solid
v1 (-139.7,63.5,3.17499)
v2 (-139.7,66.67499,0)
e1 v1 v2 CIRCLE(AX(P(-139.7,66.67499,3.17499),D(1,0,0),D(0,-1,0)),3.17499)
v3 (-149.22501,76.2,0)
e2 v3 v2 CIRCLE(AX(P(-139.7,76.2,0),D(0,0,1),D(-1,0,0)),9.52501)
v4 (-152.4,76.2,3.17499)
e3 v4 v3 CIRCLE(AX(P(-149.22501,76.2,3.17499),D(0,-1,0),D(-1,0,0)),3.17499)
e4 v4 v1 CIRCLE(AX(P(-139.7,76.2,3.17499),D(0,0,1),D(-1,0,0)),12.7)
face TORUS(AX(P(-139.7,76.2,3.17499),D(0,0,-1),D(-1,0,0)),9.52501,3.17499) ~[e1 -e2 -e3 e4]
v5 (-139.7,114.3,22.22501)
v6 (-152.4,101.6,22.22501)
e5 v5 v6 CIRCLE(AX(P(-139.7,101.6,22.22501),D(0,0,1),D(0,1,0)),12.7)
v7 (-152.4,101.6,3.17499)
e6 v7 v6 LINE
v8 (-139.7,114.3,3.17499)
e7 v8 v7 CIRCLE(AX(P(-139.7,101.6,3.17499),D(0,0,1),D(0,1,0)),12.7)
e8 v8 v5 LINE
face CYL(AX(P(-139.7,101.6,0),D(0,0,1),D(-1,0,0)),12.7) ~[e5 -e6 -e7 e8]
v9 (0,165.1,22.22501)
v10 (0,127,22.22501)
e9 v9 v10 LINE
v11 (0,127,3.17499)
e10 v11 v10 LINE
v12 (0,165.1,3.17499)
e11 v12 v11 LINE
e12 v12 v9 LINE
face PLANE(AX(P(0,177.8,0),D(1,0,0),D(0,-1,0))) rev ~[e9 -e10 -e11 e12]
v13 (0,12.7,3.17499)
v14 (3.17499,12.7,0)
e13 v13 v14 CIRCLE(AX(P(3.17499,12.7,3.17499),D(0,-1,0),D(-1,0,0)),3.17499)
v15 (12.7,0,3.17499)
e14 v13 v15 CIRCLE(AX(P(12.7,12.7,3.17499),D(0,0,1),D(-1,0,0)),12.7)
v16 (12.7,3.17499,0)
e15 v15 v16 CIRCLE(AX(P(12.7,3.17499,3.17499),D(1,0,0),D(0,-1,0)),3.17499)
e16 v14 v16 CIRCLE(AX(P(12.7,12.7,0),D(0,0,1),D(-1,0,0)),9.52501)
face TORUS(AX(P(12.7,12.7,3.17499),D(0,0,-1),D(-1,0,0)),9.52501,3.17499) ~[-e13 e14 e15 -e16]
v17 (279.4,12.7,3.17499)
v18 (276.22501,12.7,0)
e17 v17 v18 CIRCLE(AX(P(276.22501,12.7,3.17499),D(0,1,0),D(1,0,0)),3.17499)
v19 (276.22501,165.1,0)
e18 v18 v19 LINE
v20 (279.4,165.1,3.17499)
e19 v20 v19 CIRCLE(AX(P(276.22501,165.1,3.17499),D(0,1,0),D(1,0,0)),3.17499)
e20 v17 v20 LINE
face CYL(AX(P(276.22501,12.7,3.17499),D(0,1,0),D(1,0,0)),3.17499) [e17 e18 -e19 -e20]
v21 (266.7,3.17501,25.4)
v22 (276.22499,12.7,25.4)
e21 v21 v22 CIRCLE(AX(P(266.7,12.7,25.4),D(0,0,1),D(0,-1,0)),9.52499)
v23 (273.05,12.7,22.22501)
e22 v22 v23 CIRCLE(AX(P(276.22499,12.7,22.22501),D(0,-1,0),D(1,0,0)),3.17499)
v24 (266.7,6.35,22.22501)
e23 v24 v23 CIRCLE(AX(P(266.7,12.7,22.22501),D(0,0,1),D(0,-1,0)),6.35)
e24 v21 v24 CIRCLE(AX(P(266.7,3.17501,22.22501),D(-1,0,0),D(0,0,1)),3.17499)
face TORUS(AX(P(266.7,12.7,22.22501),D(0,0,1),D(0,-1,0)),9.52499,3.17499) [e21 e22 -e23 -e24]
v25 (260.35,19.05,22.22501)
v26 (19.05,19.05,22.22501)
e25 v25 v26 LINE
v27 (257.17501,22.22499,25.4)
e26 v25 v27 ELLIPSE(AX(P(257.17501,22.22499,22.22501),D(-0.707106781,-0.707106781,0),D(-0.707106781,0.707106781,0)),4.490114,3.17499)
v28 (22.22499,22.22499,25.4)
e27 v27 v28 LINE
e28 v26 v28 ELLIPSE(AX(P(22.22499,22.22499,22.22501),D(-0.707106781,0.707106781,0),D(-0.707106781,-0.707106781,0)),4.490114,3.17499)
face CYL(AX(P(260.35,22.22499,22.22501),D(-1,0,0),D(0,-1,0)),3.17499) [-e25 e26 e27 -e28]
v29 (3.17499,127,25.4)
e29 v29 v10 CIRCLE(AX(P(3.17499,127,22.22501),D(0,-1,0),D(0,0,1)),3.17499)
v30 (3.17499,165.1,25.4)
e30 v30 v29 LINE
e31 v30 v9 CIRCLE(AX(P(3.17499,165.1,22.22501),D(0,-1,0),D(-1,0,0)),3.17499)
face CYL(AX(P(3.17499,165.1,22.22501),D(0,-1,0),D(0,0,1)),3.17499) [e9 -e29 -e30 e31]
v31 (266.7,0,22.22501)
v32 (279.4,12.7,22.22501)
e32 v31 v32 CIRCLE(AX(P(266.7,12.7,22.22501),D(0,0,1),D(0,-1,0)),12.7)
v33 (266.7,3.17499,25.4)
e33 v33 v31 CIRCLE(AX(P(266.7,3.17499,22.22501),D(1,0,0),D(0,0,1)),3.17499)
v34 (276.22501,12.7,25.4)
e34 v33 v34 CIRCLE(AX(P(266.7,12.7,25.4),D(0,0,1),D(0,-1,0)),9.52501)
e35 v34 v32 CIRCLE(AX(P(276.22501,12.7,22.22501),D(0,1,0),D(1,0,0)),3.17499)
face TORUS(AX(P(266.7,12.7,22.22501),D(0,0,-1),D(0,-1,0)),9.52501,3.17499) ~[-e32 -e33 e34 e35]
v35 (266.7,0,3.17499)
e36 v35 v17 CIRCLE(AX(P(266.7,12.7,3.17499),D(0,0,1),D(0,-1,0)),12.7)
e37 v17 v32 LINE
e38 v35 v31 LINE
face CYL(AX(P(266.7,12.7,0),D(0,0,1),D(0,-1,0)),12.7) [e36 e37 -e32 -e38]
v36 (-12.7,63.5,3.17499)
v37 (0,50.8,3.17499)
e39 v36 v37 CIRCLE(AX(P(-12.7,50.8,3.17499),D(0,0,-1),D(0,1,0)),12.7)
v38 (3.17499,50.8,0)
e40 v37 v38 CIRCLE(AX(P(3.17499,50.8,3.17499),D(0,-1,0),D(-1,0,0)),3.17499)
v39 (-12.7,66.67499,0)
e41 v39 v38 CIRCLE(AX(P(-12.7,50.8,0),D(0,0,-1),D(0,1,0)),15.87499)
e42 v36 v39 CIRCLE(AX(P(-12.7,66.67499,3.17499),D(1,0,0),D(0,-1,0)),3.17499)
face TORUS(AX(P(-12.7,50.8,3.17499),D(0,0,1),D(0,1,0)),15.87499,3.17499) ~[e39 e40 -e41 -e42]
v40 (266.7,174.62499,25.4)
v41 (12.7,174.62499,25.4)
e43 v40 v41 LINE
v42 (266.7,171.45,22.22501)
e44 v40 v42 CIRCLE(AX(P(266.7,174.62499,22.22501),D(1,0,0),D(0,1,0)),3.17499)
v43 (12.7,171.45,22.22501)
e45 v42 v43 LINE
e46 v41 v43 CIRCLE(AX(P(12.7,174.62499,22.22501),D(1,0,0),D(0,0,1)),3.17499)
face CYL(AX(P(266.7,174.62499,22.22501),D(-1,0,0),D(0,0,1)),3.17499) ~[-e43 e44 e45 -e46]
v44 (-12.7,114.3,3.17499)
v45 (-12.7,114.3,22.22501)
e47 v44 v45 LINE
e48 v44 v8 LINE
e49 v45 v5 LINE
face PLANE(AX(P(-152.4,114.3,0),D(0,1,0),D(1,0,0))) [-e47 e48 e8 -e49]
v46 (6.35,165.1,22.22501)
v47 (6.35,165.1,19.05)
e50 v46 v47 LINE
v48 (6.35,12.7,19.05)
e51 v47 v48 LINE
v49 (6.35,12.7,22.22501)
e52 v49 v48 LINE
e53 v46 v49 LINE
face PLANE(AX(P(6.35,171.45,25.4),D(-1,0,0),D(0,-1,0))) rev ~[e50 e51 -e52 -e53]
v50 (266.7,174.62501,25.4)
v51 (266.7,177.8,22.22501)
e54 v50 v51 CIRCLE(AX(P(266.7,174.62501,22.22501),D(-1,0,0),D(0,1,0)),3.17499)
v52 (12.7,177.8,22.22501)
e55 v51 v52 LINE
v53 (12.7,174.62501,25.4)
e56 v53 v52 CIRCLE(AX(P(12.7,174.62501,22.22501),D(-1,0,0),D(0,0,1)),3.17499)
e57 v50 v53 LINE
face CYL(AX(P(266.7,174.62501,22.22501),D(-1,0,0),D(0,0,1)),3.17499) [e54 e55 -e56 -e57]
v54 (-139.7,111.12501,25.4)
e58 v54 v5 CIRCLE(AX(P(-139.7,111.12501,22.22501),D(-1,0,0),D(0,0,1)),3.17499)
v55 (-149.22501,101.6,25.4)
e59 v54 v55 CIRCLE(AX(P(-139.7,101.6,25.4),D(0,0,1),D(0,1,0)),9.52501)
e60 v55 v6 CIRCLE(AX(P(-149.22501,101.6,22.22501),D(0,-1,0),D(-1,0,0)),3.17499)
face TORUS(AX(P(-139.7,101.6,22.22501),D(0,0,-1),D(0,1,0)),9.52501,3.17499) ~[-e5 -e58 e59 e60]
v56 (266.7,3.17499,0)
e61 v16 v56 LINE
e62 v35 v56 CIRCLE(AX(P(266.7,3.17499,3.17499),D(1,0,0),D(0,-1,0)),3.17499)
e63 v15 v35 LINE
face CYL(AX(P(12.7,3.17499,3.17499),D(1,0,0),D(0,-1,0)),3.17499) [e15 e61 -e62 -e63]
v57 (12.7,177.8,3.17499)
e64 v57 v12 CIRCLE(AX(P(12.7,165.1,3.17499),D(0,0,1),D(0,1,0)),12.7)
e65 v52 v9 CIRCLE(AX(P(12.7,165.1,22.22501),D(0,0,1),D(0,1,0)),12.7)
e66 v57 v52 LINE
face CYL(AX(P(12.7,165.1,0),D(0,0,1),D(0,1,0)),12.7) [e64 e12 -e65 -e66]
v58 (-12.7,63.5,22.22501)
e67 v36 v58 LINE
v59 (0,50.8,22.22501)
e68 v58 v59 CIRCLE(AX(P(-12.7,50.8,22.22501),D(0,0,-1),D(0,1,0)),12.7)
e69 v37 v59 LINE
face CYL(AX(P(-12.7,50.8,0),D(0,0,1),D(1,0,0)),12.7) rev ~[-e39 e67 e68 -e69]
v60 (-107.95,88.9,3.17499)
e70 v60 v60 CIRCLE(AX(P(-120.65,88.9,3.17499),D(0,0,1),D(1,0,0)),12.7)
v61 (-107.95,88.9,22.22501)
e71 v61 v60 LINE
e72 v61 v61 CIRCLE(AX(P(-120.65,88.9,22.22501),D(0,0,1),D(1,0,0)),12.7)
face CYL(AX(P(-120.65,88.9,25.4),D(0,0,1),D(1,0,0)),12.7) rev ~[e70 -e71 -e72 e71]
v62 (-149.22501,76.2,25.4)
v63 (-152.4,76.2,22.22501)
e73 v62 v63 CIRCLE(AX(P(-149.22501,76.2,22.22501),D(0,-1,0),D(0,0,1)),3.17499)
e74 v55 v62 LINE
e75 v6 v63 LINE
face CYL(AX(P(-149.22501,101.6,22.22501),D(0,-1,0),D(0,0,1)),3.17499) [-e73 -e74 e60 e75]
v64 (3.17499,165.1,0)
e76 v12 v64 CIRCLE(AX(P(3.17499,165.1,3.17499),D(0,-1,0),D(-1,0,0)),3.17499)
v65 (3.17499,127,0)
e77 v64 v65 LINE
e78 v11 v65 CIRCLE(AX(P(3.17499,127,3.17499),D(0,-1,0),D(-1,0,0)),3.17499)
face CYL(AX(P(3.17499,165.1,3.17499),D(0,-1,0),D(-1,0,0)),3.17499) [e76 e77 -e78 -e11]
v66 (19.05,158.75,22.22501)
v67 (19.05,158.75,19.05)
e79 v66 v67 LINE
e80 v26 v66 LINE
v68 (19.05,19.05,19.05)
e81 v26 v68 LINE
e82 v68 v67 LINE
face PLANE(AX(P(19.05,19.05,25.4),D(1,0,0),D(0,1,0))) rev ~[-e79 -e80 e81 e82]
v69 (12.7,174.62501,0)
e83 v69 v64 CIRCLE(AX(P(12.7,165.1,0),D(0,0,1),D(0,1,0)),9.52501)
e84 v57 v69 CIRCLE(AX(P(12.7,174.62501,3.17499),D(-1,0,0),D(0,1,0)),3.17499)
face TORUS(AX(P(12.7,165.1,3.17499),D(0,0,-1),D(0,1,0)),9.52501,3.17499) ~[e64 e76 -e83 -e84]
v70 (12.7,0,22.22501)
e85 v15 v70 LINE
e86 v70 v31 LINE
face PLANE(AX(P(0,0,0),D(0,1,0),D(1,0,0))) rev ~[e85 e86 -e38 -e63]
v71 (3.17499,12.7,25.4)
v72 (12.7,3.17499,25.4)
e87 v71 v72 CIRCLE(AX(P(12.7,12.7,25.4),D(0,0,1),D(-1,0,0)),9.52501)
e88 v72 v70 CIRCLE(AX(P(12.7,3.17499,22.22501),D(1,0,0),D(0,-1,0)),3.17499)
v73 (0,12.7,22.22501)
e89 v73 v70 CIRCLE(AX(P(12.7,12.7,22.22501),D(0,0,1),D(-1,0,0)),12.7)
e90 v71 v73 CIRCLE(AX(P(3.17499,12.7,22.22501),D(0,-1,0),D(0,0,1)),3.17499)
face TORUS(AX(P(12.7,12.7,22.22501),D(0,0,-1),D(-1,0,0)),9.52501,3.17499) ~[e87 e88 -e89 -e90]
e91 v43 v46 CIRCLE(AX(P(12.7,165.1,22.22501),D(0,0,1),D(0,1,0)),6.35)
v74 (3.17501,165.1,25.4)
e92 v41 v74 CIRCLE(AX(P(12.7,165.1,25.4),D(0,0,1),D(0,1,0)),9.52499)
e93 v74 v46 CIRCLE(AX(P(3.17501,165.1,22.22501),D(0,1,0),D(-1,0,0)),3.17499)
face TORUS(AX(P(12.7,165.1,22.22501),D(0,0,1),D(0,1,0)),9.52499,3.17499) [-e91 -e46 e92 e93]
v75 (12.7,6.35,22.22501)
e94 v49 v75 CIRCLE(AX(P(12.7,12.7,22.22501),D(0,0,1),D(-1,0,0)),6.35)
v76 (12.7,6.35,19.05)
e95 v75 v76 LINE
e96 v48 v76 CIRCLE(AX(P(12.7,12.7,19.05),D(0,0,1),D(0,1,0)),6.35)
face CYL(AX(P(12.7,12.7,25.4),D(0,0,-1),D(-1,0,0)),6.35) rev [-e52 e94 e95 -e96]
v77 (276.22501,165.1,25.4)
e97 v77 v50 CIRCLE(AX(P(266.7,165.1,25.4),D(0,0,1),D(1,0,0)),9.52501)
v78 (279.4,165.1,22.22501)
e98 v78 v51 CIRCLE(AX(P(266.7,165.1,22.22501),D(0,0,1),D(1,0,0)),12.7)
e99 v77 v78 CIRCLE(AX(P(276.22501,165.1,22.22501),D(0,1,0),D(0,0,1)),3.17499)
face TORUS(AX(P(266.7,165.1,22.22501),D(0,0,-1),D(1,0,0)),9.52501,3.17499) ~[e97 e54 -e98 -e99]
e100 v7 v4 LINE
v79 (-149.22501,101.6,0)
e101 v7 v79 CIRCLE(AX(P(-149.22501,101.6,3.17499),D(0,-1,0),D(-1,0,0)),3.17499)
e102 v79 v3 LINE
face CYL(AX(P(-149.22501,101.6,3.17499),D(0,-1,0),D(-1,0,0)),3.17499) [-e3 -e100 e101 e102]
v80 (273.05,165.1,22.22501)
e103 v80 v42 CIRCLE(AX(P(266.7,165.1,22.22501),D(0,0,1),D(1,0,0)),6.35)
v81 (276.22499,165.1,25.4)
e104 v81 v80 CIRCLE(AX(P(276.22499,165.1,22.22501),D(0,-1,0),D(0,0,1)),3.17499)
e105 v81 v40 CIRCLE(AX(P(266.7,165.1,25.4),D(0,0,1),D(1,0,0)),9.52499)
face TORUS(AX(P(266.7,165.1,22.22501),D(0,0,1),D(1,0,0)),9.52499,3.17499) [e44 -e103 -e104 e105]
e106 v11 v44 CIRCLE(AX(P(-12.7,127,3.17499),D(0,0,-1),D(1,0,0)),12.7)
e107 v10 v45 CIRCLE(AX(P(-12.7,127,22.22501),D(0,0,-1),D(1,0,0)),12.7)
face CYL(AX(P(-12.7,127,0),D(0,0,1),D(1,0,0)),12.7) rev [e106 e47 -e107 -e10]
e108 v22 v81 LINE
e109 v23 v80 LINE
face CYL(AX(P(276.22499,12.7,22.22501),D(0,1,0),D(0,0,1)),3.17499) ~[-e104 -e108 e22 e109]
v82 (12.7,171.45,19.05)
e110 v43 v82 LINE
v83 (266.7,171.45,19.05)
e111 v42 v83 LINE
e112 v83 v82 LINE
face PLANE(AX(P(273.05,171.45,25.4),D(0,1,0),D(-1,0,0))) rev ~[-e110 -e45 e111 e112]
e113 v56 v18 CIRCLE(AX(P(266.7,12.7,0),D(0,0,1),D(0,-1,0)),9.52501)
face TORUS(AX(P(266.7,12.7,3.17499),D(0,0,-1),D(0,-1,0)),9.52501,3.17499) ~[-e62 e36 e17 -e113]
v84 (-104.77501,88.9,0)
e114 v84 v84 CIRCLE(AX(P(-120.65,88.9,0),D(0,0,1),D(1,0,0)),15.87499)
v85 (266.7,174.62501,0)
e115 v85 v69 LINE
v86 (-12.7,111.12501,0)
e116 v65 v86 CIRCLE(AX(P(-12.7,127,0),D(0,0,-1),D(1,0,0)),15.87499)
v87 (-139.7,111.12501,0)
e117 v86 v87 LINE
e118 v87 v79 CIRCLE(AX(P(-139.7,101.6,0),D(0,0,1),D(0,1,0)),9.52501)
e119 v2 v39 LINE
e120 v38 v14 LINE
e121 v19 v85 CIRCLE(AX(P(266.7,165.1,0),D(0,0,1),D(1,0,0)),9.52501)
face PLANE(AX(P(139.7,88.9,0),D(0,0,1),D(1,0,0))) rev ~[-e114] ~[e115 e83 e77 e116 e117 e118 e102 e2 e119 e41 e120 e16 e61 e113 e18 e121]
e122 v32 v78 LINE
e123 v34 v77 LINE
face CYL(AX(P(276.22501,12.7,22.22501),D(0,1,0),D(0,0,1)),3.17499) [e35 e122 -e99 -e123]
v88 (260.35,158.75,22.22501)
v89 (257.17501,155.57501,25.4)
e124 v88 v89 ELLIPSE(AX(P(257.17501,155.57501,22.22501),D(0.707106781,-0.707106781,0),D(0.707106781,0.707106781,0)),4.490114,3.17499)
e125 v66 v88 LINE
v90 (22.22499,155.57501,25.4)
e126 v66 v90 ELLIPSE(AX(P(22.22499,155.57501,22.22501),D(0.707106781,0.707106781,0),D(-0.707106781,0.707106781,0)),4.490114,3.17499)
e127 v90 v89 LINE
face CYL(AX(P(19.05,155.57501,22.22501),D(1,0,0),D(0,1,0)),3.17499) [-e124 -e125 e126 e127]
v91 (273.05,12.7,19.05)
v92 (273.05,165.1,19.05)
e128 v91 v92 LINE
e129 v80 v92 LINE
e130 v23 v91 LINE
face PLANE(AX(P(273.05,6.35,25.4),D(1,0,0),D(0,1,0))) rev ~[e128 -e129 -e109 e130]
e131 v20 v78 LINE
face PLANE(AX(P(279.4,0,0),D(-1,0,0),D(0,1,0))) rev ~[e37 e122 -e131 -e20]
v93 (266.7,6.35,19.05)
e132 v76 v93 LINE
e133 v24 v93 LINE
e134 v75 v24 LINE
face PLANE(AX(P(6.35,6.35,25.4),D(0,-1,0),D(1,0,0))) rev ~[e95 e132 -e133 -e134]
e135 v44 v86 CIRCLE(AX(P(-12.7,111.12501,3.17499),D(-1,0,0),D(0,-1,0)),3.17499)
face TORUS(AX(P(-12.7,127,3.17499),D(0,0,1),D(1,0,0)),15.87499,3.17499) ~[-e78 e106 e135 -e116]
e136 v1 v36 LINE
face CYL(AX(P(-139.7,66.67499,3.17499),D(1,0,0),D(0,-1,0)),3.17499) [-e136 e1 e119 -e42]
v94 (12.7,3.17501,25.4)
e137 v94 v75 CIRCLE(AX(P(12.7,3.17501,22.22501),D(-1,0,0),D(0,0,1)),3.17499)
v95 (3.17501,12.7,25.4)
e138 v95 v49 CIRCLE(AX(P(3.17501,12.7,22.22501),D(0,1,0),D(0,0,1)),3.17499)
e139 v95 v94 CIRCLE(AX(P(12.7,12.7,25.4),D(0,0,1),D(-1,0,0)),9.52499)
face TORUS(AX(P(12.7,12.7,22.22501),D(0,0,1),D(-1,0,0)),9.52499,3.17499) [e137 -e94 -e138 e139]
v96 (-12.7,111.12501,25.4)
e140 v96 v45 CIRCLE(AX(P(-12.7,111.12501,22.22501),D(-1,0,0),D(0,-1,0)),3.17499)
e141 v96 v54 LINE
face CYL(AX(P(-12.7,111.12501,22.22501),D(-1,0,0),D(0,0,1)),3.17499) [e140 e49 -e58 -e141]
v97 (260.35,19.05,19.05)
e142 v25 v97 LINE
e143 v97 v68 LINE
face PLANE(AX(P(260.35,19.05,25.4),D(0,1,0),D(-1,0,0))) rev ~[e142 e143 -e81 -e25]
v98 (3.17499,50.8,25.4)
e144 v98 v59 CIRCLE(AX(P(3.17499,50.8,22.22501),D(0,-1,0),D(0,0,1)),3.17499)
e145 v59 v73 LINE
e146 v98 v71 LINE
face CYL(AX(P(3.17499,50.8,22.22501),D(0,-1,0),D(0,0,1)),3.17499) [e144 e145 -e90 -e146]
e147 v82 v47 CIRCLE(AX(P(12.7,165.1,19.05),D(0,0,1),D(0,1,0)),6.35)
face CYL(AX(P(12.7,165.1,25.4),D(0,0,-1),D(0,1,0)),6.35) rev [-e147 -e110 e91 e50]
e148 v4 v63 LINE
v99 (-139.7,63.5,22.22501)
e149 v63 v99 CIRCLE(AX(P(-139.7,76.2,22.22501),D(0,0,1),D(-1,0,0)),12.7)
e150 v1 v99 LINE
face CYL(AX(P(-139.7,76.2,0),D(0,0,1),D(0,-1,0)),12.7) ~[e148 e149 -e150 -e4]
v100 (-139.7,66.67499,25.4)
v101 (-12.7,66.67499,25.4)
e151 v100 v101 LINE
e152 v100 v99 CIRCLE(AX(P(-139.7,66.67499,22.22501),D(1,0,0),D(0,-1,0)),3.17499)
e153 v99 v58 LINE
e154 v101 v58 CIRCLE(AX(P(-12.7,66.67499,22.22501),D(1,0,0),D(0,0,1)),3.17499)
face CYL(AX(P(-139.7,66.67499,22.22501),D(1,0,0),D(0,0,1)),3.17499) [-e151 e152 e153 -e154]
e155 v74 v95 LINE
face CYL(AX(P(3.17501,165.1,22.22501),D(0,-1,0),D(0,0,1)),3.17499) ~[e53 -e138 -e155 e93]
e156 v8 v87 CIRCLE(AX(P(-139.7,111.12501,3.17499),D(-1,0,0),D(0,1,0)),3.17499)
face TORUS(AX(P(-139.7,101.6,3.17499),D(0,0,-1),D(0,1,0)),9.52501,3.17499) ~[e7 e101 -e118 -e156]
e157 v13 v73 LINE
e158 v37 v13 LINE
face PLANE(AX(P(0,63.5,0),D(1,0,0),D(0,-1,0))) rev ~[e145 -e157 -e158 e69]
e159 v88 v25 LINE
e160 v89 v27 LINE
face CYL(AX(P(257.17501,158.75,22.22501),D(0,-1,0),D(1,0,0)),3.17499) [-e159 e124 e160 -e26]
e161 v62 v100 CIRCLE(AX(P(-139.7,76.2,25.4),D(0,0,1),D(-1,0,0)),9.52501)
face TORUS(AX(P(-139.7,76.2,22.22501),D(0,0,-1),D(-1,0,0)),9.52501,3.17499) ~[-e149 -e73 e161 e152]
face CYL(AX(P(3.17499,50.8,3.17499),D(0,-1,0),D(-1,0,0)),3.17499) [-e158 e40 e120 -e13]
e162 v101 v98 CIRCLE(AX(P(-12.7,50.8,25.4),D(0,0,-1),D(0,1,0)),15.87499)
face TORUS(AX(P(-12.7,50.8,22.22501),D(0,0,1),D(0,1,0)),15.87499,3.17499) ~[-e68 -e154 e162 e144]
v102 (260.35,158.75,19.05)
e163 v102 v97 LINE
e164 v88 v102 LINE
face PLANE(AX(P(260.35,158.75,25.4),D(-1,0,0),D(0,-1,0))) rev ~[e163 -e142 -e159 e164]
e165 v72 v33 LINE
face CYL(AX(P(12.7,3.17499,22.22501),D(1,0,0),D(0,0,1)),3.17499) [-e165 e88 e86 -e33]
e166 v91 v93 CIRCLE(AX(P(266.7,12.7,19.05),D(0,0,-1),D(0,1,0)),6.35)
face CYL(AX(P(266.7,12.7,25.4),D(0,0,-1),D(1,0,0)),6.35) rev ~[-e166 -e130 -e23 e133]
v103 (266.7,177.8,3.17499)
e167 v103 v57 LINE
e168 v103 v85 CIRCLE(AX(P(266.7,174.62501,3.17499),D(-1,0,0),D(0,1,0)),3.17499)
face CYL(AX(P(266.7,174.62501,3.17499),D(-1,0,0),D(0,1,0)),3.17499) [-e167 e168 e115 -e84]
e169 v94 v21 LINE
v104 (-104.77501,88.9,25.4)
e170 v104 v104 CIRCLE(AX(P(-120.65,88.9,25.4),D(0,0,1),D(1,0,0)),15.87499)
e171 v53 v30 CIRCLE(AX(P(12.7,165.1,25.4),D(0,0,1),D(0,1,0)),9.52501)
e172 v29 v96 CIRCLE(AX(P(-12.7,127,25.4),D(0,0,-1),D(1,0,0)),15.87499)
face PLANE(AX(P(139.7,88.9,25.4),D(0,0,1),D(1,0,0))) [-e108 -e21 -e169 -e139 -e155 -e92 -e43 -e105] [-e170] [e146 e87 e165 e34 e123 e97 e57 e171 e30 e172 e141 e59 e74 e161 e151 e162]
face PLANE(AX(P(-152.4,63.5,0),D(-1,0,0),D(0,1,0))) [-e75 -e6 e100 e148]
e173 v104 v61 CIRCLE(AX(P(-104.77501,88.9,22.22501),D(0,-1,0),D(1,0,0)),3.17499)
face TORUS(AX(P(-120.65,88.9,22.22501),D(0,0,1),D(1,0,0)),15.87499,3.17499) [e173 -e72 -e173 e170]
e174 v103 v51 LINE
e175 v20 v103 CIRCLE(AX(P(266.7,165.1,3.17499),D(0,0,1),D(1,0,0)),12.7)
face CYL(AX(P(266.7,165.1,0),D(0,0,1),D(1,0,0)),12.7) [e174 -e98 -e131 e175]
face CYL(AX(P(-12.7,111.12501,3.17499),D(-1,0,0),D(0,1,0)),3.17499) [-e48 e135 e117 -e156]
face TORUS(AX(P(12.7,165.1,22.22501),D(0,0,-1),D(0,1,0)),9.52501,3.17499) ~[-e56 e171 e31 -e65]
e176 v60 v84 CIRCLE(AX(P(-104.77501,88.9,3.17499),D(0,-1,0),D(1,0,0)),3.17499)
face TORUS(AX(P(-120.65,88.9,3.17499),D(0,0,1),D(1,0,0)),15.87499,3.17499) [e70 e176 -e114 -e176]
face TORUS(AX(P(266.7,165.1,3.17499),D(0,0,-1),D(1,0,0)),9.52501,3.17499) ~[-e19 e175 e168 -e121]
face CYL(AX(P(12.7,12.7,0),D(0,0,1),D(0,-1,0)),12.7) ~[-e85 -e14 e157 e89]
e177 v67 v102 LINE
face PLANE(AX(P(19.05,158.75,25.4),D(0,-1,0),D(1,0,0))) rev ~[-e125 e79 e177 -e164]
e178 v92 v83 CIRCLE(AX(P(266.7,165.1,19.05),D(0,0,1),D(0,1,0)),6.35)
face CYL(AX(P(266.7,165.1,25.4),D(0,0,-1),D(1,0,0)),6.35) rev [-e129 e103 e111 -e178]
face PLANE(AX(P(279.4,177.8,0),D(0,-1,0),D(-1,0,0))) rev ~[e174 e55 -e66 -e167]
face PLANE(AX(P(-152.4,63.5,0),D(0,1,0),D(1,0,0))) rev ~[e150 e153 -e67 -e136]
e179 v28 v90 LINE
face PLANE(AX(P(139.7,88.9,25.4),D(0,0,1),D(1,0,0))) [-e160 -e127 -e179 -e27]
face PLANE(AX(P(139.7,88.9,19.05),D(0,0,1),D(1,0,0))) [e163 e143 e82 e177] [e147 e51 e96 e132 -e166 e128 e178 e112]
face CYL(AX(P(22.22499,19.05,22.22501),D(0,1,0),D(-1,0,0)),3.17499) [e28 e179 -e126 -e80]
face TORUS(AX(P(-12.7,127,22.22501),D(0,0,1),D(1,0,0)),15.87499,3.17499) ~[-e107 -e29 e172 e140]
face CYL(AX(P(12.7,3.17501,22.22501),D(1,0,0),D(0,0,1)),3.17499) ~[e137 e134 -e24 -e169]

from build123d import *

# Parameters (mm, degrees)
F0_W     = 152.4
F0_H     = 50.8
F1_DEPTH = 25.4
F2_R     = 12.7
F3_DEPTH = 25.4
F5_DEPTH = 6.35
F6_R     = 6.35
F7_R     = 12.7
F8_R     = 3.17499


# Not quite as in the source:
# - a fillet or chamfer is up to 0.001 mm smaller than in the source, because OpenCascade refuses the exact size


with BuildPart() as f1:
    # F0 (on Top) → F1 (new body)
    with BuildSketch(Plane.XY):
        Polygon((0, 63.5), (0, 0), (279.4, 0), (279.4, 177.8), (0, 177.8), (0, 114.3), align=None)
        with Locations((-76.2, 88.9)):
            Rectangle(F0_W, F0_H)
    extrude(amount=F1_DEPTH)

    # F2 (on face) → F3 (cut)
    with BuildSketch(Plane.XY.offset(25.4)):
        with Locations((-120.65, 88.9)):
            Circle(F2_R)
    extrude(amount=-F3_DEPTH, mode=Mode.SUBTRACT)

    # F4 (on face) → F5 (cut)
    with BuildSketch(Plane.XY.offset(25.4)):
        Polygon((273.05, 6.35), (273.05, 171.45), (6.35, 171.45), (6.35, 107.95), (6.35, 69.85), (6.35, 6.35), align=None)
        Polygon((19.05, 107.95), (19.05, 158.75), (260.35, 158.75), (260.35, 19.05), (19.05, 19.05), (19.05, 69.85), align=None, mode=Mode.SUBTRACT)
    extrude(amount=-F5_DEPTH, mode=Mode.SUBTRACT)

    # F6
    f6_edges = [f1.edges().sort_by_distance(p)[0] for p in [
        (6.35, 171.45, 22.225),
        (273.05, 171.45, 22.225),
        (6.35, 6.35, 22.225),
        (273.05, 6.35, 22.225),
    ]]
    fillet(f6_edges, radius=F6_R)

    # F7
    f7_edges = [f1.edges().sort_by_distance(p)[0] for p in [
        (0, 0, 12.7),
        (-152.4, 63.5, 12.7),
        (0, 63.5, 12.7),
        (-152.4, 114.3, 12.7),
        (0, 114.3, 12.7),
        (0, 177.8, 12.7),
        (279.4, 0, 12.7),
        (279.4, 177.8, 12.7),
    ]]
    fillet(f7_edges, radius=F7_R)

    # F8 (radius 3.175 in the source; OpenCascade refuses exactly that, so slightly less here)
    f8_edges = [f1.edges().sort_by_distance(p)[0] for p in [
        (139.7, 19.05, 25.4),
        (19.05, 88.9, 25.4),
        (139.7, 158.75, 25.4),
        (260.35, 88.9, 25.4),
        (0, 31.75, 25.4),
        (-3.719744, 59.780256, 25.4),
        (3.719744, 3.719744, 25.4),
        (-76.2, 63.5, 25.4),
        (139.7, 0, 25.4),
        (-148.680256, 67.219744, 25.4),
        (275.680256, 3.719744, 25.4),
        (-152.4, 88.9, 25.4),
        (279.4, 88.9, 25.4),
        (-148.680256, 110.580256, 25.4),
        (275.680256, 174.080256, 25.4),
        (-76.2, 114.3, 25.4),
        (139.7, 177.8, 25.4),
        (-3.719744, 118.019744, 25.4),
        (3.719744, 174.080256, 25.4),
        (0, 146.05, 25.4),
        (139.7, 6.35, 25.4),
        (8.209872, 8.209872, 25.4),
        (271.190128, 8.209872, 25.4),
        (6.35, 88.9, 25.4),
        (273.05, 88.9, 25.4),
        (8.209872, 169.590128, 25.4),
        (271.190128, 169.590128, 25.4),
        (139.7, 171.45, 25.4),
        (-133.35, 88.9, 25.4),
        (0, 31.75, 0),
        (-3.719744, 59.780256, 0),
        (3.719744, 3.719744, 0),
        (-76.2, 63.5, 0),
        (139.7, 0, 0),
        (-148.680256, 67.219744, 0),
        (275.680256, 3.719744, 0),
        (-152.4, 88.9, 0),
        (279.4, 88.9, 0),
        (-148.680256, 110.580256, 0),
        (275.680256, 174.080256, 0),
        (-76.2, 114.3, 0),
        (139.7, 177.8, 0),
        (-3.719744, 118.019744, 0),
        (3.719744, 174.080256, 0),
        (0, 146.05, 0),
        (-133.35, 88.9, 0),
    ]]
    fillet(f8_edges, radius=F8_R)


solid = f1.part
